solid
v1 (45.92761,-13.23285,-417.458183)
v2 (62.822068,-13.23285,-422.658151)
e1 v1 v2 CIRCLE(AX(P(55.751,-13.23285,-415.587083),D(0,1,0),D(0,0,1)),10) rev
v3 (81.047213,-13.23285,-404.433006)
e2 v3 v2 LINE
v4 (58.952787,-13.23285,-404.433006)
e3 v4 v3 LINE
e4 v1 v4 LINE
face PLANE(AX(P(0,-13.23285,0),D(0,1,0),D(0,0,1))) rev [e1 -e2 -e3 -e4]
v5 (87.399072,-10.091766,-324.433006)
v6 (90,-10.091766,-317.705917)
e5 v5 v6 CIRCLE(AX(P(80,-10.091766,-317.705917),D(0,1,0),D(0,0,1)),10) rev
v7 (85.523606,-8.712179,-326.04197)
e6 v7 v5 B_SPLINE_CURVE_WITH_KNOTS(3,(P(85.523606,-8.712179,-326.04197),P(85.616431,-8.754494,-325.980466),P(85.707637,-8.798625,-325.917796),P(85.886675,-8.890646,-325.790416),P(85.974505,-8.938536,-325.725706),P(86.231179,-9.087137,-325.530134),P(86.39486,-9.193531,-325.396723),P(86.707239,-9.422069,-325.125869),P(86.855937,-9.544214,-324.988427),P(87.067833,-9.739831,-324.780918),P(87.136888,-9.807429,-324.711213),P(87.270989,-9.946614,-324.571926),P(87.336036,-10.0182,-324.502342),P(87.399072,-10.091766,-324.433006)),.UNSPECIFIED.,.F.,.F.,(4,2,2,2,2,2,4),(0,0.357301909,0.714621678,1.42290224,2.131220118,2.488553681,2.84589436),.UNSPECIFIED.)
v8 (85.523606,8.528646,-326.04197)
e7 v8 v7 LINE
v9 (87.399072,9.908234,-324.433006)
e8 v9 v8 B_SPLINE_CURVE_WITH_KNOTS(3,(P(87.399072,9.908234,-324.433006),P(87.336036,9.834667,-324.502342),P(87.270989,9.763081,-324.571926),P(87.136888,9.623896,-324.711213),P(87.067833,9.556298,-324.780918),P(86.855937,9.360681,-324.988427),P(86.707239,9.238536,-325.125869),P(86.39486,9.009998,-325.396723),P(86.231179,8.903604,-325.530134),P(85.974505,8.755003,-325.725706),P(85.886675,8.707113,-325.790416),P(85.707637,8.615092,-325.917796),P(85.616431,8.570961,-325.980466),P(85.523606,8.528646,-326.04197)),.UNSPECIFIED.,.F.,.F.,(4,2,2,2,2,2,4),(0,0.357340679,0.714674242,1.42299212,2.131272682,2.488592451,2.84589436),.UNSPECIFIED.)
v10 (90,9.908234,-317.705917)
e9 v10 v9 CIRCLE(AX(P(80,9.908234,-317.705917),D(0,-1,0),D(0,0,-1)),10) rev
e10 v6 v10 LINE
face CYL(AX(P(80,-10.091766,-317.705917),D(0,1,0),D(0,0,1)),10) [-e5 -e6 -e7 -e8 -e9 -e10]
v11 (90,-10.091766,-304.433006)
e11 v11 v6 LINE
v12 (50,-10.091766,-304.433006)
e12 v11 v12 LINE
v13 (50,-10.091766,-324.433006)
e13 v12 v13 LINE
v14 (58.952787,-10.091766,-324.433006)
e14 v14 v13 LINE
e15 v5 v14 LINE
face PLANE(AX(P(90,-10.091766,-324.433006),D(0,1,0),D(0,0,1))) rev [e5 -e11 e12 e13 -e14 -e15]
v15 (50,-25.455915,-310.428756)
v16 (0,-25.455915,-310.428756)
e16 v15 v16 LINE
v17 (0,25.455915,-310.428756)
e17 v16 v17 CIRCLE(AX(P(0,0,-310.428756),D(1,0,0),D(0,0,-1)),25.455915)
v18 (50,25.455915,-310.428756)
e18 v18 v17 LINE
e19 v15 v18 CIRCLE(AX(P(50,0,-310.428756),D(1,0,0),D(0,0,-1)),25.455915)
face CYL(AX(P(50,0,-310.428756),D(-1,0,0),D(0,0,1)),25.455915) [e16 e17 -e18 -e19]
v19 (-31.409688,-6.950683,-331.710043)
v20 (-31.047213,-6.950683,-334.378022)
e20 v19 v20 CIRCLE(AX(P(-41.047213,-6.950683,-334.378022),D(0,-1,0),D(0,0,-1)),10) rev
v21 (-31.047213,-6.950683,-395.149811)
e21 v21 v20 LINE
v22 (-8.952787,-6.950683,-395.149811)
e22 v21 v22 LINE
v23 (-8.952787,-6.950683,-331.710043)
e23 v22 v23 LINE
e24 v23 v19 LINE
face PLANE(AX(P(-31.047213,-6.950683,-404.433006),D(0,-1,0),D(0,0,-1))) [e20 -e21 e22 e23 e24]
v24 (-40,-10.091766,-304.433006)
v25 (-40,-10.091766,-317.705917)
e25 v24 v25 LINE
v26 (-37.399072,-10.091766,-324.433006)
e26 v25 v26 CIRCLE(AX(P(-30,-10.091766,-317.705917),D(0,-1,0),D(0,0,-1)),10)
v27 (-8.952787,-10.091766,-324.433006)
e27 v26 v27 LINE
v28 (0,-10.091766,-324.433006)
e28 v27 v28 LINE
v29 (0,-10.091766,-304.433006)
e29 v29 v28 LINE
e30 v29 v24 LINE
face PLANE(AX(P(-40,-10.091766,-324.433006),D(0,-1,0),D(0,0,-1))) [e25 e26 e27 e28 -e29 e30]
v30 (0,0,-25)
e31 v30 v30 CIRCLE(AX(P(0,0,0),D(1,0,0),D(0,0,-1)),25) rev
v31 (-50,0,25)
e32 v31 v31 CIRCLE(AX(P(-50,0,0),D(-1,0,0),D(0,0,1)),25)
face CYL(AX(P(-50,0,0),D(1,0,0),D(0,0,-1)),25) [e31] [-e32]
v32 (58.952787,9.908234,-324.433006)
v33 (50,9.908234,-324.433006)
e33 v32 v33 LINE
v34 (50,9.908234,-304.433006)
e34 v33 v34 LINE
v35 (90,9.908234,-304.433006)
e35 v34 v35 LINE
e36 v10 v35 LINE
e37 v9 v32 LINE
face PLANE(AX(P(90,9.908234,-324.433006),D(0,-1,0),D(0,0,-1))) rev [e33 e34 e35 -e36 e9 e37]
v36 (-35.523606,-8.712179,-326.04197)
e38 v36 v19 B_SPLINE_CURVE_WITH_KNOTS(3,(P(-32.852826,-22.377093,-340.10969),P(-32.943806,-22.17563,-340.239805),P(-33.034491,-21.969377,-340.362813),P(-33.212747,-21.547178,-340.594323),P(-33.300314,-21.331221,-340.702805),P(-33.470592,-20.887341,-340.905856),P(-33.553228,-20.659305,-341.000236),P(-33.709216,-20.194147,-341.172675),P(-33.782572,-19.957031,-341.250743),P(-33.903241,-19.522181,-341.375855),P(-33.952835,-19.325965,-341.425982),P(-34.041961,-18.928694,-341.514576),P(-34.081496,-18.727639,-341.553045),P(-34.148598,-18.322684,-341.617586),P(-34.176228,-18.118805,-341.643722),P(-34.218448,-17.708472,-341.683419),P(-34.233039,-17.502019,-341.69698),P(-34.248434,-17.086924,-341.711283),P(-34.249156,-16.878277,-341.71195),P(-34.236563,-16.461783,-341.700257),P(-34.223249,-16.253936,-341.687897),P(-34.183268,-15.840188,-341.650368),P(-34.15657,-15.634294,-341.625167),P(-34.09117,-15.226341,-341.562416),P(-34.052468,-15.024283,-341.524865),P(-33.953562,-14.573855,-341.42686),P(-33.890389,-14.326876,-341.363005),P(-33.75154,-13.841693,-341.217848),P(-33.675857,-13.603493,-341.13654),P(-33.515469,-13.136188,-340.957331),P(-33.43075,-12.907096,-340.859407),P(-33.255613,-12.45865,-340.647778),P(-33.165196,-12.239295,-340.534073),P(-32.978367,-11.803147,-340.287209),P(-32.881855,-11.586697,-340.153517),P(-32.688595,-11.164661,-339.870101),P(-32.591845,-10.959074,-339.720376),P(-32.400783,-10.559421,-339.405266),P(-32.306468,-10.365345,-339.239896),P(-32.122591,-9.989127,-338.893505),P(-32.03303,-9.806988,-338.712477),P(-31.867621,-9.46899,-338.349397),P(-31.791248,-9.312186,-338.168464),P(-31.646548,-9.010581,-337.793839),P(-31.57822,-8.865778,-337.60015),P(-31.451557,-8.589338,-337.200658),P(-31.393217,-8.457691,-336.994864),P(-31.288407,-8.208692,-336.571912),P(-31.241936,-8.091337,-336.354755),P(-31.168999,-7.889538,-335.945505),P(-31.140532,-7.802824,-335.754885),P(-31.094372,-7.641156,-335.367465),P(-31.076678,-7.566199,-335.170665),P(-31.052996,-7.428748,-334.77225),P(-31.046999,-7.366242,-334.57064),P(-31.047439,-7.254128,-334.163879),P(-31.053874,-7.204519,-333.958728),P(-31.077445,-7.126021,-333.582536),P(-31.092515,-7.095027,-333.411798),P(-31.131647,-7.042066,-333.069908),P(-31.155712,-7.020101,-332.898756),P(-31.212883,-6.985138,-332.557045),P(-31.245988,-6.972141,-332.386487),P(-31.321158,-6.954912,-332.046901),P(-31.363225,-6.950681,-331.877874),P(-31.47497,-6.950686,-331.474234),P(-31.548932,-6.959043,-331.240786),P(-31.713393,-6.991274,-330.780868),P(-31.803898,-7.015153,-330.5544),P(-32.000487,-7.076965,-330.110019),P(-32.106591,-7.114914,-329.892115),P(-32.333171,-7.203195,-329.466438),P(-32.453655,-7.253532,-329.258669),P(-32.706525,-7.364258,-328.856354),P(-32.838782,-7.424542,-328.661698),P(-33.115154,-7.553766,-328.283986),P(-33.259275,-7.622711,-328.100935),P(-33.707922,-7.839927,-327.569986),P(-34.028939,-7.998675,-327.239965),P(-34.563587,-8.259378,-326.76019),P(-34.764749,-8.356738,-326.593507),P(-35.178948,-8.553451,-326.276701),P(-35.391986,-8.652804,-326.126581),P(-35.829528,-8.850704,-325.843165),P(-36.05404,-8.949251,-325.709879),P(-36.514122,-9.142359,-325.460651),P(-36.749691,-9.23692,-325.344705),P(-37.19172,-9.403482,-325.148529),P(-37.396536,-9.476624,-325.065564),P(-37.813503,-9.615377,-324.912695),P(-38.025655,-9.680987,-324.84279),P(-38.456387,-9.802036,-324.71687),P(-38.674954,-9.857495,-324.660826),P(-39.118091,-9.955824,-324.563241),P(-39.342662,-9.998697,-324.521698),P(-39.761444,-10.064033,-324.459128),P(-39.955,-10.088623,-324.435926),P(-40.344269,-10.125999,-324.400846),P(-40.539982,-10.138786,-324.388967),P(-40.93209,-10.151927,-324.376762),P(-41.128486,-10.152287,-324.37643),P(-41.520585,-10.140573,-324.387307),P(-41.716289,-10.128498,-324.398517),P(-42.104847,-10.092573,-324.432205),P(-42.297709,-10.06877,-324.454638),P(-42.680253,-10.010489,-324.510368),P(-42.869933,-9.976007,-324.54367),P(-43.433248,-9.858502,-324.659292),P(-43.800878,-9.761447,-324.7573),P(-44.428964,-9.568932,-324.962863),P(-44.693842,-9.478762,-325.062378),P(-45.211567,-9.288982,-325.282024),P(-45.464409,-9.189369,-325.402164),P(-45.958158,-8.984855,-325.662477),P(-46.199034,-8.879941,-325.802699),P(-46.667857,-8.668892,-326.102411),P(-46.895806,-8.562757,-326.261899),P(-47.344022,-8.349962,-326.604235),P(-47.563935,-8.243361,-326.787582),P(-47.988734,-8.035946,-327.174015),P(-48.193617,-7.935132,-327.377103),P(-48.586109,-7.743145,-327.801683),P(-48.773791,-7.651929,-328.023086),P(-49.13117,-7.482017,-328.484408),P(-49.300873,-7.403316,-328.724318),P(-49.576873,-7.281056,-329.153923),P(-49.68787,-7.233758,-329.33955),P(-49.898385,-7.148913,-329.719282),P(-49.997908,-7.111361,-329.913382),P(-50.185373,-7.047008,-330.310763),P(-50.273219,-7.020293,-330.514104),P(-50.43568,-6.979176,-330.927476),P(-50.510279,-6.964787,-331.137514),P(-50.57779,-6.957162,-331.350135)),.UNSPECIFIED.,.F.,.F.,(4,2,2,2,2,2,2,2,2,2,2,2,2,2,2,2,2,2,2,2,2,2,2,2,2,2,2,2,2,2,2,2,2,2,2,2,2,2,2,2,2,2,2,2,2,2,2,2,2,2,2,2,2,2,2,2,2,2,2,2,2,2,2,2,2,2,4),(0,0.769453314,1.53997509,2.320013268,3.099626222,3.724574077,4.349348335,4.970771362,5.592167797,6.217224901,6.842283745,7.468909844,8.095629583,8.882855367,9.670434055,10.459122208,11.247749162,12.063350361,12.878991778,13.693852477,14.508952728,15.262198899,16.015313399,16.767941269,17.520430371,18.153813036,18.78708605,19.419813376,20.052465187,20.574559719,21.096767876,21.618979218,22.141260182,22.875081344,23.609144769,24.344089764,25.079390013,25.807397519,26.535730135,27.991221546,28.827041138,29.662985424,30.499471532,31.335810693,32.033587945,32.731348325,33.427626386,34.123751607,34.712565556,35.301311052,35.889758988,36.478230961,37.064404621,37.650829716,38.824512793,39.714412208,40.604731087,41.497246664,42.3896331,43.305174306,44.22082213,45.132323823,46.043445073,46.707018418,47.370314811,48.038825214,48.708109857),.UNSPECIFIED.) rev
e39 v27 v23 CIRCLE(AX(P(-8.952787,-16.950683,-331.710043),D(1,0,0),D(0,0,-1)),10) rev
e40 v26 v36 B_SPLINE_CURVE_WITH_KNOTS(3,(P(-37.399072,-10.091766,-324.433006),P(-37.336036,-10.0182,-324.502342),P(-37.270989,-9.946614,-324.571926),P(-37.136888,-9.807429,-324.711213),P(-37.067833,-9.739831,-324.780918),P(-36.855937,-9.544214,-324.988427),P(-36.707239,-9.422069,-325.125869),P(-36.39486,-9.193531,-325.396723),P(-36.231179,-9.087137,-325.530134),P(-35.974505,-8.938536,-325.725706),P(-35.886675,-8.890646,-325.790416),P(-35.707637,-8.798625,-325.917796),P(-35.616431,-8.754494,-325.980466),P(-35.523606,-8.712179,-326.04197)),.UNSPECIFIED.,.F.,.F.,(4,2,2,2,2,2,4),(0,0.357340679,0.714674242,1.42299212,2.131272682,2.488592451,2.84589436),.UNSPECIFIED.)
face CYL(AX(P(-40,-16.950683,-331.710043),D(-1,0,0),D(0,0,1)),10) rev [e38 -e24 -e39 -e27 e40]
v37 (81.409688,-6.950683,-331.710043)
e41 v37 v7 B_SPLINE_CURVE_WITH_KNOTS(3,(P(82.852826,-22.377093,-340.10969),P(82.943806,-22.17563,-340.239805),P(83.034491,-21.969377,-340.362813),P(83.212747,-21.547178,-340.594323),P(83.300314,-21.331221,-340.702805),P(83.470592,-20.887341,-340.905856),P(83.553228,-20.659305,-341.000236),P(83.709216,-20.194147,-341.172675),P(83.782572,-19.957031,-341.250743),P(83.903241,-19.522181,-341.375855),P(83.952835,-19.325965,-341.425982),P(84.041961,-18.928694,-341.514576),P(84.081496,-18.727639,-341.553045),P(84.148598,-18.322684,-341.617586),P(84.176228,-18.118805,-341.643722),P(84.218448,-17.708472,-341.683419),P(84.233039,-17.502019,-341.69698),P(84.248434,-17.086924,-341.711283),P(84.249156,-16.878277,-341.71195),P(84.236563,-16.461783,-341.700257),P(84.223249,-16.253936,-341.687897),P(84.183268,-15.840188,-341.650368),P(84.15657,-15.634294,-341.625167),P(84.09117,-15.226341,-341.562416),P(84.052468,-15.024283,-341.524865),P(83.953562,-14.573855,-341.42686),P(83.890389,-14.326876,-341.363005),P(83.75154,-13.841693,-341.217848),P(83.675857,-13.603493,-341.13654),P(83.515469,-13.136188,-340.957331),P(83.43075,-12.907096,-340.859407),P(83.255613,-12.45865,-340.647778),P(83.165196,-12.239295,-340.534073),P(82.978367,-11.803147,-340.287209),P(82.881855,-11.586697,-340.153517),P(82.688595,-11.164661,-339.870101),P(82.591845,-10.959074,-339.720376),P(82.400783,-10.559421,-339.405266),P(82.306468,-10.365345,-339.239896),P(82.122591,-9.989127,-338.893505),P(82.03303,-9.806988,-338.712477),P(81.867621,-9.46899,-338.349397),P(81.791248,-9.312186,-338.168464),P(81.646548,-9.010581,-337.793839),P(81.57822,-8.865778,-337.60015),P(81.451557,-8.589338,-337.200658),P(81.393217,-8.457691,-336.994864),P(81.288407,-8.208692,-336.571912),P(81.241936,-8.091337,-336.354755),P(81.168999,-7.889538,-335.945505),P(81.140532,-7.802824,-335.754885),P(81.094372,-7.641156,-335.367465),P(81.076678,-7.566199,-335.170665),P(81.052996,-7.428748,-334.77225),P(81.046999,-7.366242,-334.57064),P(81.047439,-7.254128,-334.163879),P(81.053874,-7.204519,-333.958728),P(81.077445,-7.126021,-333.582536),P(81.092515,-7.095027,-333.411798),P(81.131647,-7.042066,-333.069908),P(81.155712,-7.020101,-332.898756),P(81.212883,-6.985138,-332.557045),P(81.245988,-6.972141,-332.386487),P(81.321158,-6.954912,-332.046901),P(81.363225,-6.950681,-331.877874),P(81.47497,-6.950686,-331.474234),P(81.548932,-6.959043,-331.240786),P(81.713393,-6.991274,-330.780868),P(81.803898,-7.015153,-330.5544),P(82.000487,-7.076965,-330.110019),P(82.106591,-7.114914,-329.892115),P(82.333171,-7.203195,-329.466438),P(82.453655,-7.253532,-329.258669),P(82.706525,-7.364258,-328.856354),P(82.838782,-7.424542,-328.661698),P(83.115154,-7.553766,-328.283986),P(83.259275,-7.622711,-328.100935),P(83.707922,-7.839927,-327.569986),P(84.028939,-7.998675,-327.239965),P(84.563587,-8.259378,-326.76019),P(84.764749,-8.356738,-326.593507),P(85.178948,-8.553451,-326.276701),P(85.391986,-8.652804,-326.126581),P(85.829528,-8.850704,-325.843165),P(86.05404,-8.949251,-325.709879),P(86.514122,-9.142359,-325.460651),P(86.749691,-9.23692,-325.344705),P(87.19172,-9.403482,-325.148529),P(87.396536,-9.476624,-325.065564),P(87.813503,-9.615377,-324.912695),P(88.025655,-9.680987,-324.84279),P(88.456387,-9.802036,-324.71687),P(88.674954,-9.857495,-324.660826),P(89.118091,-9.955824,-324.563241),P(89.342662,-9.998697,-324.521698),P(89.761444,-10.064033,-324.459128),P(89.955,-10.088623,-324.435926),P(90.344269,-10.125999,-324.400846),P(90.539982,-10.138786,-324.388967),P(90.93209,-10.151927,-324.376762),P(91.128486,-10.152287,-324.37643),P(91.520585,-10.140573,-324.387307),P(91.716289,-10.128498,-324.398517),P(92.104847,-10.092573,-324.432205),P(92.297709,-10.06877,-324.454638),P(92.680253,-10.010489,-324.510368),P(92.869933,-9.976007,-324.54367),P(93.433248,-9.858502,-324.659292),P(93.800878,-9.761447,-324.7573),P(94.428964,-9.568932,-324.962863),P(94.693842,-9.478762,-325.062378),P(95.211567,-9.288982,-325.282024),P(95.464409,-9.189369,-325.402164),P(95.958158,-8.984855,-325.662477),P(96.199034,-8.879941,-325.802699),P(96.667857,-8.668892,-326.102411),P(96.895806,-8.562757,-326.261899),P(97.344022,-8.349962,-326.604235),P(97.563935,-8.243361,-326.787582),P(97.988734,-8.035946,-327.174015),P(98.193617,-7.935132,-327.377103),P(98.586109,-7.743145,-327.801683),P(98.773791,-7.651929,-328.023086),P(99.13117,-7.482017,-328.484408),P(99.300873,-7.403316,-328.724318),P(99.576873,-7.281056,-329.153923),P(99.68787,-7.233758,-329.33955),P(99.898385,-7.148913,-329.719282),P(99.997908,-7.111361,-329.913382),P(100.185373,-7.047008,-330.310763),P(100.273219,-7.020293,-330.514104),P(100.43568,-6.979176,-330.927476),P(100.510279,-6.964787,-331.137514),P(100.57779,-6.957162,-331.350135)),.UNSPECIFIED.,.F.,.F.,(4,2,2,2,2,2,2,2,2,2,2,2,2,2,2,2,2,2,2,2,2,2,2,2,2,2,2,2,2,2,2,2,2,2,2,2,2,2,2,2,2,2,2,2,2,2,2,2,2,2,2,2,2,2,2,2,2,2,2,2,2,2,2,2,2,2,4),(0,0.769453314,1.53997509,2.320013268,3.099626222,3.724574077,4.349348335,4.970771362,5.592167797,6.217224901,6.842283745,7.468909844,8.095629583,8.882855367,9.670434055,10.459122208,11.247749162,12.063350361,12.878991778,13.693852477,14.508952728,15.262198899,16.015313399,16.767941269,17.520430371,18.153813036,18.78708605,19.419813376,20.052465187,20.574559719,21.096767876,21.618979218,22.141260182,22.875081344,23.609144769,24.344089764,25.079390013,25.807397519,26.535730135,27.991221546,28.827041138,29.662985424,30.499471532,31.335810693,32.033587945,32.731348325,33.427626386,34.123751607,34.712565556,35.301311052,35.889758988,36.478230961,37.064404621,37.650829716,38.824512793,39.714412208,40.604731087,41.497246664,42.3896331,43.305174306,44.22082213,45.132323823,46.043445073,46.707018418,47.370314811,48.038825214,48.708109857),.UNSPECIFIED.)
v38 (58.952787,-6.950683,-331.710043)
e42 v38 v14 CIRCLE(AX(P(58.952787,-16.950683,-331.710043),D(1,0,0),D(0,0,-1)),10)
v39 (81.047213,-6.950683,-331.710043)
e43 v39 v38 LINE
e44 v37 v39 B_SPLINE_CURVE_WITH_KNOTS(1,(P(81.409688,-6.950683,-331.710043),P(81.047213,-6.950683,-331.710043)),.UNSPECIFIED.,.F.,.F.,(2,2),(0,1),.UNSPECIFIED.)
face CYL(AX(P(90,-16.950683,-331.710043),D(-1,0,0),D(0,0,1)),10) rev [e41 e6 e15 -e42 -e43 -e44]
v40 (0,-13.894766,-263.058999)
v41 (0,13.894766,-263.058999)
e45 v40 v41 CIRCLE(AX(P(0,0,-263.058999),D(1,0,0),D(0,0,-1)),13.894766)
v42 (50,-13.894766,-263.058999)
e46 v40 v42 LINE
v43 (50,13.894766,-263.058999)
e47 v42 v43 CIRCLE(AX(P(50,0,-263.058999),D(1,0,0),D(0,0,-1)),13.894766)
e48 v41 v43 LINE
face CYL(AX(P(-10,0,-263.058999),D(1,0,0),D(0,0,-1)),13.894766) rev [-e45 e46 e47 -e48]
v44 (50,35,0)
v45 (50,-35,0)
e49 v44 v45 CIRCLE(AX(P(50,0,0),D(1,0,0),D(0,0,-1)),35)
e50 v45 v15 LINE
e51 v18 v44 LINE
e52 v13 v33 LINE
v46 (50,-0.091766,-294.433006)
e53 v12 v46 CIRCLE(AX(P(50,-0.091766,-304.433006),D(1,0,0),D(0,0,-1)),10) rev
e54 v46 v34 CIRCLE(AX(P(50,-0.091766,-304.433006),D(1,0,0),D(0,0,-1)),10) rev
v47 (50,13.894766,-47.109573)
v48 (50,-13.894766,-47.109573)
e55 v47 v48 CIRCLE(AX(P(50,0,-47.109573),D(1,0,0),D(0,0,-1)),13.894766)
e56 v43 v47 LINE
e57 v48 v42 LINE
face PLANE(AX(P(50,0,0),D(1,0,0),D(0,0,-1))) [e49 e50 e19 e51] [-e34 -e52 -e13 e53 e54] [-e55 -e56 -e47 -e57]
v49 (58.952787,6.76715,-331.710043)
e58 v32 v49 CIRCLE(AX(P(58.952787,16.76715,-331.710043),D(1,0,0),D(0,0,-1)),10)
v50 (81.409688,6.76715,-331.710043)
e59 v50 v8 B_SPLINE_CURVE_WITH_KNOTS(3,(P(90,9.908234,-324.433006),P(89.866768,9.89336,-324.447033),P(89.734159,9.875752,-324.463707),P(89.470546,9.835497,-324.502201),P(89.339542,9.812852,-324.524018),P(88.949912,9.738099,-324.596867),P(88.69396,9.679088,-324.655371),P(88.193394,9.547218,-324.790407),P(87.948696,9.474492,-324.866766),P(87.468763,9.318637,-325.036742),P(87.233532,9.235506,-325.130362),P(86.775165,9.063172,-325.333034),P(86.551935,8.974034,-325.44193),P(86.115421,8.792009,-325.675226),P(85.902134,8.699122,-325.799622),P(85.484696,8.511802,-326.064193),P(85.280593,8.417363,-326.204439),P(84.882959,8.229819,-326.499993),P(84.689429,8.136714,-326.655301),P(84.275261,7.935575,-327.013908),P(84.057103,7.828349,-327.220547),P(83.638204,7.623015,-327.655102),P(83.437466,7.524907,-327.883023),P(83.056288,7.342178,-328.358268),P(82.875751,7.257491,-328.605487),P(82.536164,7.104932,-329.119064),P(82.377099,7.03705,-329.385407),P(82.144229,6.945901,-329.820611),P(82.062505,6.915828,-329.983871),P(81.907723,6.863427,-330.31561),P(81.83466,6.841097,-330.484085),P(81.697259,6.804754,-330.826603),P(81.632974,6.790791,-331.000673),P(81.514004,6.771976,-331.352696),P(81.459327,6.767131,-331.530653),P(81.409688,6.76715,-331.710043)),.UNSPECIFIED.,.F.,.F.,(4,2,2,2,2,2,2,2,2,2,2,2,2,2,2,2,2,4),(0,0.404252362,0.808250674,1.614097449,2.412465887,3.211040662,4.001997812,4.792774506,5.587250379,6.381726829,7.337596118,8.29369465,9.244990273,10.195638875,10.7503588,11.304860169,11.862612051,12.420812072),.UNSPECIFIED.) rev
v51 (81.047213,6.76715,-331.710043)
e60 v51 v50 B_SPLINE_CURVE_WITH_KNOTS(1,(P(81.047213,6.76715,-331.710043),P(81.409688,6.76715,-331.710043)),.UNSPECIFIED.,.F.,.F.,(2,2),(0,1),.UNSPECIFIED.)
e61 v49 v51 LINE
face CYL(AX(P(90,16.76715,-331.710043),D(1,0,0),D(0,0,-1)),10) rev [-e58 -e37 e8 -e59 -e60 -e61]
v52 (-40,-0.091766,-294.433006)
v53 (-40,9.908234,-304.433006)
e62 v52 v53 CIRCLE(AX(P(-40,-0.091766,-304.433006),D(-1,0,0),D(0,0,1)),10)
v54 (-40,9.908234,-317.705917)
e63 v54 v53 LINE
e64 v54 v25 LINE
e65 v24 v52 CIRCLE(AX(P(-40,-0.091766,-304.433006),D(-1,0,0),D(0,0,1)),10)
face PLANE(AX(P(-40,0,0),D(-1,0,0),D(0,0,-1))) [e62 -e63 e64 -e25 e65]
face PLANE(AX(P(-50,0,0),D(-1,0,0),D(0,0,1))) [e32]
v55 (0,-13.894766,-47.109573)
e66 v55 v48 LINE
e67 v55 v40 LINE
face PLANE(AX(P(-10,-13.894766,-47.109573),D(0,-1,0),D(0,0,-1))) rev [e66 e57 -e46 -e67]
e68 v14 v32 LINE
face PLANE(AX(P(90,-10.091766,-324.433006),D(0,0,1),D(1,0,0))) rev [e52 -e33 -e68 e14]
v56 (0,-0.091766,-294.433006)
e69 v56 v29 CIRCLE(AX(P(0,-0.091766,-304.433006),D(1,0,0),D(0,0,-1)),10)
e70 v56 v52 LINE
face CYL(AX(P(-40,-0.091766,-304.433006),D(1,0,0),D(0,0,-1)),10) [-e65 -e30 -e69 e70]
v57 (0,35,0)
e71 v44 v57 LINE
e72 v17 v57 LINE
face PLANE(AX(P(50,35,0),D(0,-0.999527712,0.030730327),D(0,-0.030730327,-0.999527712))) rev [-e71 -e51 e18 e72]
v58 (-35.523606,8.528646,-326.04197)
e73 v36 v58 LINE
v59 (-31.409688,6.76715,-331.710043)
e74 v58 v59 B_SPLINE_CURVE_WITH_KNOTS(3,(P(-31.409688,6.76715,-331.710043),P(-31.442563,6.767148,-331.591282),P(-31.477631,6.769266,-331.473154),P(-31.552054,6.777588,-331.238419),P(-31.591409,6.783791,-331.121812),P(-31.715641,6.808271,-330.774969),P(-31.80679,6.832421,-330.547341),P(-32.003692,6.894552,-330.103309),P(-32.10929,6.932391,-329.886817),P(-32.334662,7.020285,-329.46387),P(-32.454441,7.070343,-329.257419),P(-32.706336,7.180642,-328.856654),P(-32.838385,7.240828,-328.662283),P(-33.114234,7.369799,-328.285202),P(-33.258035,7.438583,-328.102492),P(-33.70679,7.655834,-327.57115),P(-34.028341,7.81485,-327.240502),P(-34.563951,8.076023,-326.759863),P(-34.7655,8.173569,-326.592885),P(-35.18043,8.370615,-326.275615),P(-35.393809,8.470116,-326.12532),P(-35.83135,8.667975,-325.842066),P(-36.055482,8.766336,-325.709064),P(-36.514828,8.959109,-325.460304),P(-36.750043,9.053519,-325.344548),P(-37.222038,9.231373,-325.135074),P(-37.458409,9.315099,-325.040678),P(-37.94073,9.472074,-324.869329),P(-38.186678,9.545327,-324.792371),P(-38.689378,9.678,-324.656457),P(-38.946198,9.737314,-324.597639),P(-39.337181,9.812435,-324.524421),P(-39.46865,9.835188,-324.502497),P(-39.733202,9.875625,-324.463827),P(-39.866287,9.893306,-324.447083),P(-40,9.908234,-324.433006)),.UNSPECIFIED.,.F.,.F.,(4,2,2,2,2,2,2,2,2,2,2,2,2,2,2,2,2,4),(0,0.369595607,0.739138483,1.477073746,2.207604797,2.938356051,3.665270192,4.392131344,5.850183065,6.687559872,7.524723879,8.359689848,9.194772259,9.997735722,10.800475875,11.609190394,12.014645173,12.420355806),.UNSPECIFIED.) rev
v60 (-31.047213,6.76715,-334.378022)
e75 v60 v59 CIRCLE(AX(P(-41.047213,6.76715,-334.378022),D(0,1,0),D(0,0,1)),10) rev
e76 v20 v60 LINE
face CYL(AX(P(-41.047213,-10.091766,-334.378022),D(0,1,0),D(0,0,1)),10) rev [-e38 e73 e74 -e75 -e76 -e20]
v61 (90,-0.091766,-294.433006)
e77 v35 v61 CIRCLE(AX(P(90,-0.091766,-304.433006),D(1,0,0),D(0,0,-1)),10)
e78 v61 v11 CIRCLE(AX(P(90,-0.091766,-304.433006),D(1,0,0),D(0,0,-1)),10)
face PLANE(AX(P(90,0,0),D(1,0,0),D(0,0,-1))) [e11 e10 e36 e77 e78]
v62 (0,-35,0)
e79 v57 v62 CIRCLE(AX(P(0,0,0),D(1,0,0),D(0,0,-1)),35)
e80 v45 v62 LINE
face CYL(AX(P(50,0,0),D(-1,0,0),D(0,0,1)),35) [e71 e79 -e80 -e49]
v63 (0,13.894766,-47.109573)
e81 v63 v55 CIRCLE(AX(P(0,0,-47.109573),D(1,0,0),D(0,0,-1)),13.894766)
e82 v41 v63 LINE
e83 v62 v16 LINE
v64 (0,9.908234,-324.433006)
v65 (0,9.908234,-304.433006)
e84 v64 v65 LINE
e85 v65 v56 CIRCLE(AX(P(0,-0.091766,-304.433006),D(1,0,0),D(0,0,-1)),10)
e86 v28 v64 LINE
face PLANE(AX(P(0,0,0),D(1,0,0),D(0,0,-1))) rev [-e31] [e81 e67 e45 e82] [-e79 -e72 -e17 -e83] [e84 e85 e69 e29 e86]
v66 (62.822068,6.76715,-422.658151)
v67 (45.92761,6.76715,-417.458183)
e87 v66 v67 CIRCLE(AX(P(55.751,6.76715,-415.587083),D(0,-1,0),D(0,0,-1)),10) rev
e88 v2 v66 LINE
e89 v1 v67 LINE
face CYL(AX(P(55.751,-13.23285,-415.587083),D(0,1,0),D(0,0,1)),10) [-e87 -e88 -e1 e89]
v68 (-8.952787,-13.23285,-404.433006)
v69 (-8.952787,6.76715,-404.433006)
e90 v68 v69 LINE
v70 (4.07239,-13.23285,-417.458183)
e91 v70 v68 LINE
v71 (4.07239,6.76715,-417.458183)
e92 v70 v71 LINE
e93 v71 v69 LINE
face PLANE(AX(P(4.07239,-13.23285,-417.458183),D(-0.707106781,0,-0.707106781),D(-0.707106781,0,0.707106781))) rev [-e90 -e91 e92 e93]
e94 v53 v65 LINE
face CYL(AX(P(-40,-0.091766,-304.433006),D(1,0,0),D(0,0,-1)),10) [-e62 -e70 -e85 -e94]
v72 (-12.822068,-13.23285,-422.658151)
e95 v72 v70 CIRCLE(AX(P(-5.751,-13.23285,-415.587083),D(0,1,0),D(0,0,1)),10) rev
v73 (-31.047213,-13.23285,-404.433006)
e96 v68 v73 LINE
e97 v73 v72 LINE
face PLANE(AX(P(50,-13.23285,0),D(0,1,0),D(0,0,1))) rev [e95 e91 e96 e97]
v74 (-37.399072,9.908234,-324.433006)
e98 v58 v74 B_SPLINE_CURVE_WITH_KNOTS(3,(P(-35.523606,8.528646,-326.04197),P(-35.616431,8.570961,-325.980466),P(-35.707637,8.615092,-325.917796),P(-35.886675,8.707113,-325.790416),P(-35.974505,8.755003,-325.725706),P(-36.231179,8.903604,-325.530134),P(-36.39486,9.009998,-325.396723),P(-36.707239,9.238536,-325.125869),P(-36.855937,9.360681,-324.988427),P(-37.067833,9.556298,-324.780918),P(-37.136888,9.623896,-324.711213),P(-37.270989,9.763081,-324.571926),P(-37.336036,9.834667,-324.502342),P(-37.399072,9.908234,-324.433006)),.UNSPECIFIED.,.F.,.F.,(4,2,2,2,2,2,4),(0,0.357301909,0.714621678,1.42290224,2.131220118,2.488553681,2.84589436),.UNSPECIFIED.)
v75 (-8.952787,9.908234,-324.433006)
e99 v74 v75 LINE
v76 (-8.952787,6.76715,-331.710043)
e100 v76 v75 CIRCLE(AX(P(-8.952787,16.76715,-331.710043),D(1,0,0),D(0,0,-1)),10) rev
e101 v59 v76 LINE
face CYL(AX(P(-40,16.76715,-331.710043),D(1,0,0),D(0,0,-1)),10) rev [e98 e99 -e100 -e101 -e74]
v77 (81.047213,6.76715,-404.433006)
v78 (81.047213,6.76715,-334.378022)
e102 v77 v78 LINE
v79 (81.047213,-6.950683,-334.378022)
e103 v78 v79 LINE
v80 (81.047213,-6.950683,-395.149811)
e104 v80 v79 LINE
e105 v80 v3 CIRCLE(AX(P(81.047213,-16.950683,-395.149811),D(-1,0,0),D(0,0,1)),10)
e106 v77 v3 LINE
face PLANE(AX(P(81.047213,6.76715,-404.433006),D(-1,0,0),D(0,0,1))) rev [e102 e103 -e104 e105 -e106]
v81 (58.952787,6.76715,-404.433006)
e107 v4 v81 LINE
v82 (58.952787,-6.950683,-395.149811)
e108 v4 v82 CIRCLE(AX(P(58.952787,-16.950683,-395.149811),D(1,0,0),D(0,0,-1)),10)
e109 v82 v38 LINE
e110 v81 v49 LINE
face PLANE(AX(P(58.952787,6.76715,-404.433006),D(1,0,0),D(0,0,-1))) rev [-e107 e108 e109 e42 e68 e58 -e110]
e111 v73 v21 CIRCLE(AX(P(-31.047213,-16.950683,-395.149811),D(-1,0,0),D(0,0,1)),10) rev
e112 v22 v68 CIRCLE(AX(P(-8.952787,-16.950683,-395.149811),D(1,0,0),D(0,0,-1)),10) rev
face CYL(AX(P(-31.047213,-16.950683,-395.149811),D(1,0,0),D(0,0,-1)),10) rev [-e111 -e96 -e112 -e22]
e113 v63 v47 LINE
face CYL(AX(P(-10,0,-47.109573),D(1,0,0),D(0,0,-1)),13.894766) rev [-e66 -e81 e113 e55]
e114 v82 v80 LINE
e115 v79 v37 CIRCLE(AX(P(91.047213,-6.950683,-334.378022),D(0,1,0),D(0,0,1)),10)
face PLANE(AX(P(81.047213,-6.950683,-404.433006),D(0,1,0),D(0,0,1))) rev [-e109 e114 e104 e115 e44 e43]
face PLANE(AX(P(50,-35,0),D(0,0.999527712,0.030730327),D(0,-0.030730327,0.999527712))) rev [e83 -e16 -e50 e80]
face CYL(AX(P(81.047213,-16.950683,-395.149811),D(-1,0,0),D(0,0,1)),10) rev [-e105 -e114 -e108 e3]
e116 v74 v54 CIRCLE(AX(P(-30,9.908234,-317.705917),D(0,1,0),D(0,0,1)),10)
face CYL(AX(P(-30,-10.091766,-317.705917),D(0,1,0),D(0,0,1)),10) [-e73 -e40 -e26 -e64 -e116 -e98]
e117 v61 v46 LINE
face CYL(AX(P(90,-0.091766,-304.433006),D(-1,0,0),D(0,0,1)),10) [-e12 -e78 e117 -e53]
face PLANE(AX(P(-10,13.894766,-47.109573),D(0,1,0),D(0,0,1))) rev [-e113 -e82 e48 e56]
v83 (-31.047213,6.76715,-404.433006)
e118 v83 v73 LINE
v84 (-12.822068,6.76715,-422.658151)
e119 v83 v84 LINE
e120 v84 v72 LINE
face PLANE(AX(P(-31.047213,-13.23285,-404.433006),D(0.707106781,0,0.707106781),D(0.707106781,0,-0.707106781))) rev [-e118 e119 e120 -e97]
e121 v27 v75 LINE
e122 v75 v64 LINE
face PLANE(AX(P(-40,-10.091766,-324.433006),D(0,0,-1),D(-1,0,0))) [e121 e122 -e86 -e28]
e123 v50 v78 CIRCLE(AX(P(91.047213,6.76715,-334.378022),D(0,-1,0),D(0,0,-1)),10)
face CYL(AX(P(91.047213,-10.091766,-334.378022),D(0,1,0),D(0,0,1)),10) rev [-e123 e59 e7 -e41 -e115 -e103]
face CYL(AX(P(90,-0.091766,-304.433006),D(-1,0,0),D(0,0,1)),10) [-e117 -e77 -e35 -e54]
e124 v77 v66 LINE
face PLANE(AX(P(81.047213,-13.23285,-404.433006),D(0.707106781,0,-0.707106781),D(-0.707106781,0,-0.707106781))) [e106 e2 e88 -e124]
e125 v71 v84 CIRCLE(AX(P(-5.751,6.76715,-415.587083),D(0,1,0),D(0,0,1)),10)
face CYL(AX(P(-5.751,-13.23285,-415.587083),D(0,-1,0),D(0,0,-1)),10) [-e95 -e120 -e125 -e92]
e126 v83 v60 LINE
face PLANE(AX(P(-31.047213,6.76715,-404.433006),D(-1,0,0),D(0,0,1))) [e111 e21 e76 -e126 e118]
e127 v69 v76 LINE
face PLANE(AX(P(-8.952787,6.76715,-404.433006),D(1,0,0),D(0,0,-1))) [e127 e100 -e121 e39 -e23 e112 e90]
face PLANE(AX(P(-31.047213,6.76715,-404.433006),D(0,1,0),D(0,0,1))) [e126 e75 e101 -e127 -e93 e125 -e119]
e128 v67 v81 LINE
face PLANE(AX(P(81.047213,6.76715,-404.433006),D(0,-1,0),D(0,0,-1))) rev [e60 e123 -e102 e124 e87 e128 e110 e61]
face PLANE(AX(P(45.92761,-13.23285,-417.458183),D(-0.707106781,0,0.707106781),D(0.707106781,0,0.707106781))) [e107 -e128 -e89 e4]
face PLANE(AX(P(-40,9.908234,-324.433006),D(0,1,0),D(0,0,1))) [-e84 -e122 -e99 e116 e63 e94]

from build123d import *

# Parameters (mm, degrees)
Y_KSEKLIK_EKSTR_ZYON1_DEPTH = 50
IZIM2_R                     = 25
Y_KSEKLIK_EKSTR_ZYON2_DEPTH = 50
IZIM3_W                     = 30
IZIM3_H                     = 20
Y_KSEKLIK_EKSTR_ZYON3_DEPTH = 40
IZIM4_W                     = 22.094425692
IZIM4_H                     = 13.717833442
Y_KSEKLIK_EKSTR_ZYON4_DEPTH = 80
Y_KSEKLIK_EKSTR_ZYON5_DEPTH = 20
RADYUS1_R                   = 10
RADYUS3_R                   = 10
RADYUS4_R                   = 10
RADYUS8_R                   = 10
RADYUS9_R                   = 10
RADYUS1_OF_AYNALAMA2_R      = 10
RADYUS3_OF_AYNALAMA2_R      = 10
RADYUS4_OF_AYNALAMA2_R      = 10
RADYUS8_OF_AYNALAMA2_R      = 10
RADYUS10_R                  = 10
KES_EKSTR_ZYON1_DEPTH       = 60


# Some blends are built 0.0001 mm under size
with BuildPart() as part:
    # Çizim1 → Yükseklik-Ekstrüzyon1 (new body)
    with BuildSketch(Plane(origin=(0, 0, 0), x_dir=(0, 0, -1), z_dir=(1, 0, 0))):
        with BuildLine():
            Line((0, 35), (310.428755788, 25.455915403))
            ThreePointArc((310.428755788, 25.455915403), (335.884671191, 0), (310.428755788, -25.455915403))
            Line((310.428755788, -25.455915403), (0, -35))
            ThreePointArc((0, -35), (-35, 0), (0, 35))
        make_face()
    extrude(amount=Y_KSEKLIK_EKSTR_ZYON1_DEPTH)

    # Çizim2 → Yükseklik-Ekstrüzyon2 (add)
    with BuildSketch(Plane.ZY):
        with Locations(Location((0, 0, 0), (0, 0, 180))):
            Circle(IZIM2_R)
    extrude(amount=Y_KSEKLIK_EKSTR_ZYON2_DEPTH)

    # Çizim3 → Yükseklik-Ekstrüzyon3 (add)
    with BuildSketch(Plane(origin=(50, 0, 0), x_dir=(0, 0, -1), z_dir=(1, 0, 0))):
        with Locations((309.433006003, -0.091766489)):
            Rectangle(IZIM3_W, IZIM3_H)
    y_kseklik_ekstr_zyon3 = extrude(amount=Y_KSEKLIK_EKSTR_ZYON3_DEPTH)

    # Çizim4 → Yükseklik-Ekstrüzyon4 (add)
    with BuildSketch(Plane(origin=(0, 0, -324.433006003), x_dir=(-1, 0, 0), z_dir=(0, 0, -1))):
        with Locations((-70, -0.091766489)):
            Rectangle(IZIM4_W, IZIM4_H)
    y_kseklik_ekstr_zyon4 = extrude(amount=Y_KSEKLIK_EKSTR_ZYON4_DEPTH)

    # Çizim5 → Yükseklik-Ekstrüzyon5 (add)
    with BuildSketch(Plane(origin=(0, 6.767150232, 0), x_dir=(1, 0, 0), z_dir=(0, 1, 0))):
        Polygon((81.047212846, 404.433006003), (45.927609997, 439.552608852), (45.927609997, 417.45818316), (58.952787154, 404.433006003), align=None)
    y_kseklik_ekstr_zyon5 = extrude(amount=-Y_KSEKLIK_EKSTR_ZYON5_DEPTH)

    # Radyus1
    # the kernel refuses this fillet: 10 mm, written as the material it adds along each edge
    with BuildSketch(Plane(origin=(81.047212846, 6.767150232, -324.433006003), x_dir=(0, 1, 0), z_dir=(-1, 0, 0)), Plane(origin=(58.952787154, -6.95068321, -324.433006003), x_dir=(0, -1, 0), z_dir=(1, 0, 0))) as radyus1_piece_1:
        with BuildLine():
            CenterArc((10, 7.277036582), RADYUS1_R, 180, 46.694227485)
            Line((0, 7.277036582), (-0.2, 7.277036582))
            Line((-0.2, 7.277036582), (-0.2, 0))
            Line((-0.2, 0), (0, -0.2))
            ThreePointArc((0, -0.2), (1.570541639, -0.2), (3.003904945, -0.145540732))
            Line((3.003904945, -0.145540732), (3.141083279, 0))
        make_face()
    extrude(amount=22.094425692)
    with BuildSketch(Plane(origin=(81.047212846, -6.95068321, -324.433006003), x_dir=(1, 0, 0), z_dir=(0, 1, 0))) as radyus1_piece_2:
        with BuildLine():
            CenterArc((10, 9.945016101), RADYUS1_R, 180, 83.988891185)
            Line((0, 9.945016101), (-0.2, 9.945016101))
            Line((-0.2, 9.945016101), (-0.2, 0))
            Line((-0.2, 0), (0, -0.2))
            ThreePointArc((0, -0.2), (4.476393577, -0.2), (8.931842897, -0.198900322))
            Line((8.931842897, -0.198900322), (8.952787154, 0))
        make_face()
    extrude(amount=13.717833442)
    with BuildSketch(Plane(origin=(81.047212846, -6.95068321, -324.433006003), x_dir=(1, 0, 0), z_dir=(0, 1, 0))) as radyus1_piece_3a_section:
        with BuildLine():
            CenterArc((10, 9.945016101), RADYUS1_R, 180, 83.988891185)
            Line((0, 9.945016101), (-0.2, 9.945016101))
            Line((-0.2, 9.945016101), (-0.2, 0))
            Line((-0.2, 0), (0, -0.2))
            ThreePointArc((0, -0.2), (4.476393577, -0.2), (8.931842897, -0.198900322))
            Line((8.931842897, -0.198900322), (8.952787154, 0))
        make_face()
    radyus1_piece_3a = extrude(amount=38.580373695, mode=Mode.PRIVATE)
    radyus1_piece_3a = split(radyus1_piece_3a, bisect_by=Plane(origin=(83.202696921, 6.767150232, -326.71552739), z_dir=(0, 1, 0)), keep=Keep.TOP, mode=Mode.PRIVATE)
    with BuildSketch(Plane(origin=(99.2398043, 6.767150232, -324.433006003), x_dir=(0, 1, 0), z_dir=(-1, 0, 0))) as radyus1_piece_3b_section:
        with BuildLine():
            CenterArc((10, 7.277036582), RADYUS1_R, 180, 46.694227485)
            Line((0, 7.277036582), (-0.2, 7.277036582))
            Line((-0.2, 7.277036582), (-0.2, 0))
            Line((-0.2, 0), (0, -0.2))
            ThreePointArc((0, -0.2), (1.570541639, -0.2), (3.003904945, -0.145540732))
            Line((3.003904945, -0.145540732), (3.141083279, 0))
        make_face()
    radyus1_piece_3b = extrude(amount=40.287017146, mode=Mode.PRIVATE)
    radyus1_piece_3b = split(radyus1_piece_3b, bisect_by=Plane(origin=(81.047212846, 7.54925635, -326.367172989), z_dir=(1, 0, 0)), keep=Keep.TOP, mode=Mode.PRIVATE)
    radyus1_piece_3 = radyus1_piece_3a & radyus1_piece_3b
    add(radyus1_piece_3)
    with BuildSketch(Plane(origin=(81.047212846, -31.813223463, -324.433006003), x_dir=(1, 0, 0), z_dir=(0, 1, 0))) as radyus1_piece_4a_section:
        with BuildLine():
            CenterArc((10, 9.945016101), RADYUS1_R, 180, 83.988891185)
            Line((0, 9.945016101), (-0.2, 9.945016101))
            Line((-0.2, 9.945016101), (-0.2, 0))
            Line((-0.2, 0), (0, -0.2))
            ThreePointArc((0, -0.2), (4.476393577, -0.2), (8.931842897, -0.198900322))
            Line((8.931842897, -0.198900322), (8.952787154, 0))
        make_face()
    radyus1_piece_4a = extrude(amount=38.580373695, mode=Mode.PRIVATE)
    radyus1_piece_4a = split(radyus1_piece_4a, bisect_by=Plane(origin=(83.202696921, -6.95068321, -326.71552739), z_dir=(0, -1, 0)), keep=Keep.TOP, mode=Mode.PRIVATE)
    with BuildSketch(Plane(origin=(58.952787154, -6.95068321, -324.433006003), x_dir=(0, -1, 0), z_dir=(1, 0, 0))) as radyus1_piece_4b_section:
        with BuildLine():
            CenterArc((10, 7.277036582), RADYUS1_R, 180, 46.694227485)
            Line((0, 7.277036582), (-0.2, 7.277036582))
            Line((-0.2, 7.277036582), (-0.2, 0))
            Line((-0.2, 0), (0, -0.2))
            ThreePointArc((0, -0.2), (1.570541639, -0.2), (3.003904945, -0.145540732))
            Line((3.003904945, -0.145540732), (3.141083279, 0))
        make_face()
    radyus1_piece_4b = extrude(amount=40.287017146, mode=Mode.PRIVATE)
    radyus1_piece_4b = split(radyus1_piece_4b, bisect_by=Plane(origin=(81.047212846, -7.732789327, -326.367172989), z_dir=(1, 0, 0)), keep=Keep.TOP, mode=Mode.PRIVATE)
    radyus1_piece_4 = radyus1_piece_4a & radyus1_piece_4b
    add(radyus1_piece_4)

    # Radyus3
    radyus3_edges = [part.edges().sort_by_distance(p)[0] for p in [
        (90, -0.091766489, -324.433006003),
    ]]
    fillet(radyus3_edges, radius=RADYUS3_R)

    # Radyus4
    radyus4_edges = [part.edges().sort_by_distance(p)[0] for p in [
        (70, -10.091766489, -294.433006003),
        (70, 9.908233511, -294.433006003),
    ]]
    fillet(radyus4_edges, radius=RADYUS4_R - 0.0001)  # a hair under: the kernel refuses the full size

    # Radyus8
    # the kernel refuses this fillet: 10 mm, written as the material it takes off along each edge
    with BuildSketch(Plane(origin=(45.927609997, 66.498077734, -439.552608852), x_dir=(0, 0, 1), z_dir=(0, -1, 0))) as radyus8_piece_1:
        with BuildLine():
            CenterArc((23.965525365, -9.823389741), RADYUS8_R, 100.784173019, 124.215826981)
            Line((16.894457553, -16.894457553), (16.753036197, -17.03587891))
            Line((16.753036197, -17.03587891), (-0.141421356, -0.141421356))
            Line((-0.141421356, -0.141421356), (0, 0.2))
            ThreePointArc((0, 0.2), (11.047212846, 0.2), (22.057003698, 0.196467795))
            Line((22.057003698, 0.196467795), (22.094425692, 0))
        make_face()
    extrude(amount=139.461855004, mode=Mode.SUBTRACT)

    # Radyus9
    # the kernel refuses this fillet: 10 mm, written as the material it adds along each edge
    with BuildSketch(Plane(origin=(58.952787154, -6.95068321, -404.433006003), x_dir=(0, 0, 1), z_dir=(1, 0, 0))) as radyus9_piece_1_section:
        with BuildLine():
            CenterArc((9.283195274, 10), RADYUS9_R, 201.825642852, 68.174357148)
            Line((0, 6.282166558), (-0.185663905, 6.207809889))
            ThreePointArc((-0.185663905, 6.207809889), (-0.2, 3.141083279), (-0.2, 0))
            Line((-0.2, 0), (0, -0.2))
            Line((0, -0.2), (9.283195274, -0.2))
            Line((9.283195274, -0.2), (9.283195274, 0))
        make_face()
    radyus9_piece_1 = extrude(amount=22.094425692, mode=Mode.PRIVATE)
    radyus9_piece_1 = split(radyus9_piece_1, bisect_by=Plane(origin=(62.026503816, -7.778070803, -401.359289341), z_dir=(-0.707106781186545, 0, 0.70710678118655)), keep=Keep.TOP, mode=Mode.PRIVATE)
    add(radyus9_piece_1)
    with BuildSketch(Plane(origin=(35.744798969, -6.95068321, -404.433006003), x_dir=(0, 0, 1), z_dir=(1, 0, 0))) as radyus9_piece_2_section:
        with BuildLine():
            CenterArc((9.283195274, 10), RADYUS9_R, 201.825642852, 68.174357148)
            Line((0, 6.282166558), (-0.185663905, 6.207809889))
            ThreePointArc((-0.185663905, 6.207809889), (-0.2, 3.141083279), (-0.2, 0))
            Line((-0.2, 0), (0, -0.2))
            Line((0, -0.2), (9.283195274, -0.2))
            Line((9.283195274, -0.2), (9.283195274, 0))
        make_face()
    radyus9_piece_2 = extrude(amount=45.302413877, mode=Mode.PRIVATE)
    radyus9_piece_2 = split(radyus9_piece_2, bisect_by=Plane(origin=(58.952787154, -9.958064826, -404.564448842), z_dir=(-1, 0, 0)), keep=Keep.TOP, mode=Mode.PRIVATE)
    radyus9_piece_2 = split(radyus9_piece_2, bisect_by=Plane(origin=(58.854205025, -9.958064826, -404.531588132), z_dir=(0.707106781186545, 0, -0.70710678118655)), keep=Keep.TOP, mode=Mode.PRIVATE)
    add(radyus9_piece_2)
    with BuildSketch(Plane(origin=(58.952787154, -6.95068321, -404.433006003), x_dir=(0, 0, 1), z_dir=(1, 0, 0))) as radyus9_piece_3_section:
        with BuildLine():
            CenterArc((9.283195274, 10), RADYUS9_R, 201.825642852, 68.174357148)
            Line((0, 6.282166558), (-0.185663905, 6.207809889))
            ThreePointArc((-0.185663905, 6.207809889), (-0.2, 3.141083279), (-0.2, 0))
            Line((-0.2, 0), (0, -0.2))
            Line((0, -0.2), (9.283195274, -0.2))
            Line((9.283195274, -0.2), (9.283195274, 0))
        make_face()
    radyus9_piece_3 = extrude(amount=22.094425692, mode=Mode.PRIVATE)
    radyus9_piece_3 = split(radyus9_piece_3, bisect_by=Plane(origin=(66.003516805, -8.660917464, -397.382276353), z_dir=(0.707106781186545, 0, -0.70710678118655)), keep=Keep.TOP, mode=Mode.PRIVATE)
    radyus9_piece_3 = split(radyus9_piece_3, bisect_by=Plane(origin=(77.050729651, -8.660917464, -408.429489198), z_dir=(-0.7071067811865436, 0, 0.7071067811865515)), keep=Keep.TOP, mode=Mode.PRIVATE)
    add(radyus9_piece_3)

    # Aynalama2: Yükseklik-Ekstrüzyon3, Yükseklik-Ekstrüzyon4, Yükseklik-Ekstrüzyon5 across plane
    add(y_kseklik_ekstr_zyon3.mirror(Plane(origin=(25, 0, 0), x_dir=(0, 0, 1), z_dir=(1, 0, 0))))
    add(y_kseklik_ekstr_zyon4.mirror(Plane(origin=(25, 0, 0), x_dir=(0, 0, 1), z_dir=(1, 0, 0))))
    add(y_kseklik_ekstr_zyon5.mirror(Plane(origin=(25, 0, 0), x_dir=(0, 0, 1), z_dir=(1, 0, 0))))

    # Radyus1 of Aynalama2
    # the kernel refuses this fillet: 10 mm, written as the material it adds along each edge
    with BuildSketch(Plane(origin=(-31.047212846, 6.767150232, -324.433006003), x_dir=(0, 1, 0), z_dir=(1, 0, 0)), Plane(origin=(-8.952787154, -6.95068321, -324.433006003), x_dir=(0, -1, 0), z_dir=(-1, 0, 0))) as radyus1_of_aynalama2_piece_1:
        with BuildLine():
            CenterArc((10, -7.277036582), RADYUS1_OF_AYNALAMA2_R, 133.305772515, 46.694227485)
            Line((0, -7.277036582), (-0.2, -7.277036582))
            Line((-0.2, -7.277036582), (-0.2, 0))
            Line((-0.2, 0), (0, 0.2))
            ThreePointArc((0, 0.2), (1.570541639, 0.2), (3.003904945, 0.145540732))
            Line((3.003904945, 0.145540732), (3.141083279, 0))
        make_face()
    extrude(amount=22.094425692)
    with BuildSketch(Plane(origin=(-31.047212846, -6.95068321, -324.433006003), x_dir=(-1, 0, 0), z_dir=(0, 1, 0))) as radyus1_of_aynalama2_piece_2:
        with BuildLine():
            CenterArc((10, -9.945016101), RADYUS1_OF_AYNALAMA2_R, 96.011108815, 83.988891185)
            Line((0, -9.945016101), (-0.2, -9.945016101))
            Line((-0.2, -9.945016101), (-0.2, 0))
            Line((-0.2, 0), (0, 0.2))
            ThreePointArc((0, 0.2), (4.476393577, 0.2), (8.931842897, 0.198900322))
            Line((8.931842897, 0.198900322), (8.952787154, 0))
        make_face()
    extrude(amount=13.717833442)
    with BuildSketch(Plane(origin=(-31.047212846, -6.95068321, -324.433006003), x_dir=(-1, 0, 0), z_dir=(0, 1, 0))) as radyus1_of_aynalama2_piece_3a_section:
        with BuildLine():
            CenterArc((10, -9.945016101), RADYUS1_OF_AYNALAMA2_R, 96.011108815, 83.988891185)
            Line((0, -9.945016101), (-0.2, -9.945016101))
            Line((-0.2, -9.945016101), (-0.2, 0))
            Line((-0.2, 0), (0, 0.2))
            ThreePointArc((0, 0.2), (4.476393577, 0.2), (8.931842897, 0.198900322))
            Line((8.931842897, 0.198900322), (8.952787154, 0))
        make_face()
    radyus1_of_aynalama2_piece_3a = extrude(amount=38.580373695, mode=Mode.PRIVATE)
    radyus1_of_aynalama2_piece_3a = split(radyus1_of_aynalama2_piece_3a, bisect_by=Plane(origin=(-33.202696921, 6.767150232, -326.71552739), z_dir=(0, 1, 0)), keep=Keep.TOP, mode=Mode.PRIVATE)
    with BuildSketch(Plane(origin=(-49.2398043, 6.767150232, -324.433006003), x_dir=(0, 1, 0), z_dir=(1, 0, 0))) as radyus1_of_aynalama2_piece_3b_section:
        with BuildLine():
            CenterArc((10, -7.277036582), RADYUS1_OF_AYNALAMA2_R, 133.305772515, 46.694227485)
            Line((0, -7.277036582), (-0.2, -7.277036582))
            Line((-0.2, -7.277036582), (-0.2, 0))
            Line((-0.2, 0), (0, 0.2))
            ThreePointArc((0, 0.2), (1.570541639, 0.2), (3.003904945, 0.145540732))
            Line((3.003904945, 0.145540732), (3.141083279, 0))
        make_face()
    radyus1_of_aynalama2_piece_3b = extrude(amount=40.287017146, mode=Mode.PRIVATE)
    radyus1_of_aynalama2_piece_3b = split(radyus1_of_aynalama2_piece_3b, bisect_by=Plane(origin=(-31.047212846, 7.54925635, -326.367172989), z_dir=(-1, 0, 0)), keep=Keep.TOP, mode=Mode.PRIVATE)
    radyus1_of_aynalama2_piece_3 = radyus1_of_aynalama2_piece_3a & radyus1_of_aynalama2_piece_3b
    add(radyus1_of_aynalama2_piece_3)
    with BuildSketch(Plane(origin=(-31.047212846, -31.813223463, -324.433006003), x_dir=(-1, 0, 0), z_dir=(0, 1, 0))) as radyus1_of_aynalama2_piece_4a_section:
        with BuildLine():
            CenterArc((10, -9.945016101), RADYUS1_OF_AYNALAMA2_R, 96.011108815, 83.988891185)
            Line((0, -9.945016101), (-0.2, -9.945016101))
            Line((-0.2, -9.945016101), (-0.2, 0))
            Line((-0.2, 0), (0, 0.2))
            ThreePointArc((0, 0.2), (4.476393577, 0.2), (8.931842897, 0.198900322))
            Line((8.931842897, 0.198900322), (8.952787154, 0))
        make_face()
    radyus1_of_aynalama2_piece_4a = extrude(amount=38.580373695, mode=Mode.PRIVATE)
    radyus1_of_aynalama2_piece_4a = split(radyus1_of_aynalama2_piece_4a, bisect_by=Plane(origin=(-33.202696921, -6.95068321, -326.71552739), z_dir=(0, -1, 0)), keep=Keep.TOP, mode=Mode.PRIVATE)
    with BuildSketch(Plane(origin=(-8.952787154, -6.95068321, -324.433006003), x_dir=(0, -1, 0), z_dir=(-1, 0, 0))) as radyus1_of_aynalama2_piece_4b_section:
        with BuildLine():
            CenterArc((10, -7.277036582), RADYUS1_OF_AYNALAMA2_R, 133.305772515, 46.694227485)
            Line((0, -7.277036582), (-0.2, -7.277036582))
            Line((-0.2, -7.277036582), (-0.2, 0))
            Line((-0.2, 0), (0, 0.2))
            ThreePointArc((0, 0.2), (1.570541639, 0.2), (3.003904945, 0.145540732))
            Line((3.003904945, 0.145540732), (3.141083279, 0))
        make_face()
    radyus1_of_aynalama2_piece_4b = extrude(amount=40.287017146, mode=Mode.PRIVATE)
    radyus1_of_aynalama2_piece_4b = split(radyus1_of_aynalama2_piece_4b, bisect_by=Plane(origin=(-31.047212846, -7.732789327, -326.367172989), z_dir=(-1, 0, 0)), keep=Keep.TOP, mode=Mode.PRIVATE)
    radyus1_of_aynalama2_piece_4 = radyus1_of_aynalama2_piece_4a & radyus1_of_aynalama2_piece_4b
    add(radyus1_of_aynalama2_piece_4)

    # Radyus3 of Aynalama2
    radyus3_of_aynalama2_edges = [part.edges().sort_by_distance(p)[0] for p in [
        (-40, -0.091766489, -324.433006003),
    ]]
    fillet(radyus3_of_aynalama2_edges, radius=RADYUS3_OF_AYNALAMA2_R)

    # Radyus4 of Aynalama2
    radyus4_of_aynalama2_edges = [part.edges().sort_by_distance(p)[0] for p in [
        (-20, -10.091766489, -294.433006003),
        (-20, 9.908233511, -294.433006003),
    ]]
    fillet(radyus4_of_aynalama2_edges, radius=RADYUS4_OF_AYNALAMA2_R - 0.0001)  # a hair under: the kernel refuses the full size

    # Radyus8 of Aynalama2
    # the kernel refuses this fillet: 10 mm, written as the material it takes off along each edge
    with BuildSketch(Plane(origin=(4.072390003, 66.498077734, -439.552608852), x_dir=(-0.7071067811865518, 0, 0.7071067811865432), z_dir=(0, -1, 0))) as radyus8_of_aynalama2_piece_1:
        with BuildLine():
            CenterArc((23.892371001, -10), RADYUS8_OF_AYNALAMA2_R, 90, 124.215826981)
            Line((15.623118233, -15.623118233), (15.457733178, -15.735580598))
            ThreePointArc((15.457733178, -15.735580598), (7.67013776, -7.952980473), (-0.141421356, -0.141421356))
            Line((-0.141421356, -0.141421356), (0, 0.2))
            Line((0, 0.2), (23.892371001, 0.2))
            Line((23.892371001, 0.2), (23.892371001, 0))
        make_face()
    extrude(amount=139.461855004, mode=Mode.SUBTRACT)

    # Radyus10
    # the kernel refuses this fillet: 10 mm, written as the material it adds along each edge
    with BuildSketch(Plane(origin=(-8.952787154, -6.95068321, -404.433006003), x_dir=(0, 0, 1), z_dir=(-1, 0, 0))) as radyus10_piece_1_section:
        with BuildLine():
            CenterArc((9.283195274, -10), RADYUS10_R, 90, 68.174357148)
            Line((0, -6.282166558), (-0.185663905, -6.207809889))
            ThreePointArc((-0.185663905, -6.207809889), (-0.2, -3.141083279), (-0.2, 0))
            Line((-0.2, 0), (0, 0.2))
            Line((0, 0.2), (9.283195274, 0.2))
            Line((9.283195274, 0.2), (9.283195274, 0))
        make_face()
    radyus10_piece_1 = extrude(amount=22.094425692, mode=Mode.PRIVATE)
    radyus10_piece_1 = split(radyus10_piece_1, bisect_by=Plane(origin=(-12.026503816, -7.778070803, -401.359289341), z_dir=(0.707106781186545, 0, 0.70710678118655)), keep=Keep.TOP, mode=Mode.PRIVATE)
    add(radyus10_piece_1)
    with BuildSketch(Plane(origin=(14.255201031, -6.95068321, -404.433006003), x_dir=(0, 0, 1), z_dir=(-1, 0, 0))) as radyus10_piece_2_section:
        with BuildLine():
            CenterArc((9.283195274, -10), RADYUS10_R, 90, 68.174357148)
            Line((0, -6.282166558), (-0.185663905, -6.207809889))
            ThreePointArc((-0.185663905, -6.207809889), (-0.2, -3.141083279), (-0.2, 0))
            Line((-0.2, 0), (0, 0.2))
            Line((0, 0.2), (9.283195274, 0.2))
            Line((9.283195274, 0.2), (9.283195274, 0))
        make_face()
    radyus10_piece_2 = extrude(amount=45.302413877, mode=Mode.PRIVATE)
    radyus10_piece_2 = split(radyus10_piece_2, bisect_by=Plane(origin=(-8.952787154, -9.958064826, -404.564448842), z_dir=(1, 0, 0)), keep=Keep.TOP, mode=Mode.PRIVATE)
    radyus10_piece_2 = split(radyus10_piece_2, bisect_by=Plane(origin=(-8.854205025, -9.958064826, -404.531588132), z_dir=(-0.707106781186545, 0, -0.70710678118655)), keep=Keep.TOP, mode=Mode.PRIVATE)
    add(radyus10_piece_2)
    with BuildSketch(Plane(origin=(-8.952787154, -6.95068321, -404.433006003), x_dir=(0, 0, 1), z_dir=(-1, 0, 0))) as radyus10_piece_3_section:
        with BuildLine():
            CenterArc((9.283195274, -10), RADYUS10_R, 90, 68.174357148)
            Line((0, -6.282166558), (-0.185663905, -6.207809889))
            ThreePointArc((-0.185663905, -6.207809889), (-0.2, -3.141083279), (-0.2, 0))
            Line((-0.2, 0), (0, 0.2))
            Line((0, 0.2), (9.283195274, 0.2))
            Line((9.283195274, 0.2), (9.283195274, 0))
        make_face()
    radyus10_piece_3 = extrude(amount=22.094425692, mode=Mode.PRIVATE)
    radyus10_piece_3 = split(radyus10_piece_3, bisect_by=Plane(origin=(-16.003516805, -8.660917464, -397.382276353), z_dir=(-0.707106781186545, 0, -0.70710678118655)), keep=Keep.TOP, mode=Mode.PRIVATE)
    radyus10_piece_3 = split(radyus10_piece_3, bisect_by=Plane(origin=(-27.050729651, -8.660917464, -408.429489198), z_dir=(0.7071067811865436, 0, 0.7071067811865515)), keep=Keep.TOP, mode=Mode.PRIVATE)
    add(radyus10_piece_3)

    # Çizim6 → Kes-Ekstrüzyon1 (cut)
    with BuildSketch(Plane(origin=(50, 0, 0), x_dir=(0, 0, -1), z_dir=(1, 0, 0))):
        with BuildLine():
            Line((47.109572829, 13.894766115), (263.058999376, 13.894766115))
            ThreePointArc((263.058999376, 13.894766115), (276.953765491, 0), (263.058999376, -13.894766115))
            Line((263.058999376, -13.894766115), (47.109572829, -13.894766115))
            ThreePointArc((47.109572829, -13.894766115), (33.214806714, 0), (47.109572829, 13.894766115))
        make_face()
    extrude(amount=-KES_EKSTR_ZYON1_DEPTH, mode=Mode.SUBTRACT)


solid = part.part
